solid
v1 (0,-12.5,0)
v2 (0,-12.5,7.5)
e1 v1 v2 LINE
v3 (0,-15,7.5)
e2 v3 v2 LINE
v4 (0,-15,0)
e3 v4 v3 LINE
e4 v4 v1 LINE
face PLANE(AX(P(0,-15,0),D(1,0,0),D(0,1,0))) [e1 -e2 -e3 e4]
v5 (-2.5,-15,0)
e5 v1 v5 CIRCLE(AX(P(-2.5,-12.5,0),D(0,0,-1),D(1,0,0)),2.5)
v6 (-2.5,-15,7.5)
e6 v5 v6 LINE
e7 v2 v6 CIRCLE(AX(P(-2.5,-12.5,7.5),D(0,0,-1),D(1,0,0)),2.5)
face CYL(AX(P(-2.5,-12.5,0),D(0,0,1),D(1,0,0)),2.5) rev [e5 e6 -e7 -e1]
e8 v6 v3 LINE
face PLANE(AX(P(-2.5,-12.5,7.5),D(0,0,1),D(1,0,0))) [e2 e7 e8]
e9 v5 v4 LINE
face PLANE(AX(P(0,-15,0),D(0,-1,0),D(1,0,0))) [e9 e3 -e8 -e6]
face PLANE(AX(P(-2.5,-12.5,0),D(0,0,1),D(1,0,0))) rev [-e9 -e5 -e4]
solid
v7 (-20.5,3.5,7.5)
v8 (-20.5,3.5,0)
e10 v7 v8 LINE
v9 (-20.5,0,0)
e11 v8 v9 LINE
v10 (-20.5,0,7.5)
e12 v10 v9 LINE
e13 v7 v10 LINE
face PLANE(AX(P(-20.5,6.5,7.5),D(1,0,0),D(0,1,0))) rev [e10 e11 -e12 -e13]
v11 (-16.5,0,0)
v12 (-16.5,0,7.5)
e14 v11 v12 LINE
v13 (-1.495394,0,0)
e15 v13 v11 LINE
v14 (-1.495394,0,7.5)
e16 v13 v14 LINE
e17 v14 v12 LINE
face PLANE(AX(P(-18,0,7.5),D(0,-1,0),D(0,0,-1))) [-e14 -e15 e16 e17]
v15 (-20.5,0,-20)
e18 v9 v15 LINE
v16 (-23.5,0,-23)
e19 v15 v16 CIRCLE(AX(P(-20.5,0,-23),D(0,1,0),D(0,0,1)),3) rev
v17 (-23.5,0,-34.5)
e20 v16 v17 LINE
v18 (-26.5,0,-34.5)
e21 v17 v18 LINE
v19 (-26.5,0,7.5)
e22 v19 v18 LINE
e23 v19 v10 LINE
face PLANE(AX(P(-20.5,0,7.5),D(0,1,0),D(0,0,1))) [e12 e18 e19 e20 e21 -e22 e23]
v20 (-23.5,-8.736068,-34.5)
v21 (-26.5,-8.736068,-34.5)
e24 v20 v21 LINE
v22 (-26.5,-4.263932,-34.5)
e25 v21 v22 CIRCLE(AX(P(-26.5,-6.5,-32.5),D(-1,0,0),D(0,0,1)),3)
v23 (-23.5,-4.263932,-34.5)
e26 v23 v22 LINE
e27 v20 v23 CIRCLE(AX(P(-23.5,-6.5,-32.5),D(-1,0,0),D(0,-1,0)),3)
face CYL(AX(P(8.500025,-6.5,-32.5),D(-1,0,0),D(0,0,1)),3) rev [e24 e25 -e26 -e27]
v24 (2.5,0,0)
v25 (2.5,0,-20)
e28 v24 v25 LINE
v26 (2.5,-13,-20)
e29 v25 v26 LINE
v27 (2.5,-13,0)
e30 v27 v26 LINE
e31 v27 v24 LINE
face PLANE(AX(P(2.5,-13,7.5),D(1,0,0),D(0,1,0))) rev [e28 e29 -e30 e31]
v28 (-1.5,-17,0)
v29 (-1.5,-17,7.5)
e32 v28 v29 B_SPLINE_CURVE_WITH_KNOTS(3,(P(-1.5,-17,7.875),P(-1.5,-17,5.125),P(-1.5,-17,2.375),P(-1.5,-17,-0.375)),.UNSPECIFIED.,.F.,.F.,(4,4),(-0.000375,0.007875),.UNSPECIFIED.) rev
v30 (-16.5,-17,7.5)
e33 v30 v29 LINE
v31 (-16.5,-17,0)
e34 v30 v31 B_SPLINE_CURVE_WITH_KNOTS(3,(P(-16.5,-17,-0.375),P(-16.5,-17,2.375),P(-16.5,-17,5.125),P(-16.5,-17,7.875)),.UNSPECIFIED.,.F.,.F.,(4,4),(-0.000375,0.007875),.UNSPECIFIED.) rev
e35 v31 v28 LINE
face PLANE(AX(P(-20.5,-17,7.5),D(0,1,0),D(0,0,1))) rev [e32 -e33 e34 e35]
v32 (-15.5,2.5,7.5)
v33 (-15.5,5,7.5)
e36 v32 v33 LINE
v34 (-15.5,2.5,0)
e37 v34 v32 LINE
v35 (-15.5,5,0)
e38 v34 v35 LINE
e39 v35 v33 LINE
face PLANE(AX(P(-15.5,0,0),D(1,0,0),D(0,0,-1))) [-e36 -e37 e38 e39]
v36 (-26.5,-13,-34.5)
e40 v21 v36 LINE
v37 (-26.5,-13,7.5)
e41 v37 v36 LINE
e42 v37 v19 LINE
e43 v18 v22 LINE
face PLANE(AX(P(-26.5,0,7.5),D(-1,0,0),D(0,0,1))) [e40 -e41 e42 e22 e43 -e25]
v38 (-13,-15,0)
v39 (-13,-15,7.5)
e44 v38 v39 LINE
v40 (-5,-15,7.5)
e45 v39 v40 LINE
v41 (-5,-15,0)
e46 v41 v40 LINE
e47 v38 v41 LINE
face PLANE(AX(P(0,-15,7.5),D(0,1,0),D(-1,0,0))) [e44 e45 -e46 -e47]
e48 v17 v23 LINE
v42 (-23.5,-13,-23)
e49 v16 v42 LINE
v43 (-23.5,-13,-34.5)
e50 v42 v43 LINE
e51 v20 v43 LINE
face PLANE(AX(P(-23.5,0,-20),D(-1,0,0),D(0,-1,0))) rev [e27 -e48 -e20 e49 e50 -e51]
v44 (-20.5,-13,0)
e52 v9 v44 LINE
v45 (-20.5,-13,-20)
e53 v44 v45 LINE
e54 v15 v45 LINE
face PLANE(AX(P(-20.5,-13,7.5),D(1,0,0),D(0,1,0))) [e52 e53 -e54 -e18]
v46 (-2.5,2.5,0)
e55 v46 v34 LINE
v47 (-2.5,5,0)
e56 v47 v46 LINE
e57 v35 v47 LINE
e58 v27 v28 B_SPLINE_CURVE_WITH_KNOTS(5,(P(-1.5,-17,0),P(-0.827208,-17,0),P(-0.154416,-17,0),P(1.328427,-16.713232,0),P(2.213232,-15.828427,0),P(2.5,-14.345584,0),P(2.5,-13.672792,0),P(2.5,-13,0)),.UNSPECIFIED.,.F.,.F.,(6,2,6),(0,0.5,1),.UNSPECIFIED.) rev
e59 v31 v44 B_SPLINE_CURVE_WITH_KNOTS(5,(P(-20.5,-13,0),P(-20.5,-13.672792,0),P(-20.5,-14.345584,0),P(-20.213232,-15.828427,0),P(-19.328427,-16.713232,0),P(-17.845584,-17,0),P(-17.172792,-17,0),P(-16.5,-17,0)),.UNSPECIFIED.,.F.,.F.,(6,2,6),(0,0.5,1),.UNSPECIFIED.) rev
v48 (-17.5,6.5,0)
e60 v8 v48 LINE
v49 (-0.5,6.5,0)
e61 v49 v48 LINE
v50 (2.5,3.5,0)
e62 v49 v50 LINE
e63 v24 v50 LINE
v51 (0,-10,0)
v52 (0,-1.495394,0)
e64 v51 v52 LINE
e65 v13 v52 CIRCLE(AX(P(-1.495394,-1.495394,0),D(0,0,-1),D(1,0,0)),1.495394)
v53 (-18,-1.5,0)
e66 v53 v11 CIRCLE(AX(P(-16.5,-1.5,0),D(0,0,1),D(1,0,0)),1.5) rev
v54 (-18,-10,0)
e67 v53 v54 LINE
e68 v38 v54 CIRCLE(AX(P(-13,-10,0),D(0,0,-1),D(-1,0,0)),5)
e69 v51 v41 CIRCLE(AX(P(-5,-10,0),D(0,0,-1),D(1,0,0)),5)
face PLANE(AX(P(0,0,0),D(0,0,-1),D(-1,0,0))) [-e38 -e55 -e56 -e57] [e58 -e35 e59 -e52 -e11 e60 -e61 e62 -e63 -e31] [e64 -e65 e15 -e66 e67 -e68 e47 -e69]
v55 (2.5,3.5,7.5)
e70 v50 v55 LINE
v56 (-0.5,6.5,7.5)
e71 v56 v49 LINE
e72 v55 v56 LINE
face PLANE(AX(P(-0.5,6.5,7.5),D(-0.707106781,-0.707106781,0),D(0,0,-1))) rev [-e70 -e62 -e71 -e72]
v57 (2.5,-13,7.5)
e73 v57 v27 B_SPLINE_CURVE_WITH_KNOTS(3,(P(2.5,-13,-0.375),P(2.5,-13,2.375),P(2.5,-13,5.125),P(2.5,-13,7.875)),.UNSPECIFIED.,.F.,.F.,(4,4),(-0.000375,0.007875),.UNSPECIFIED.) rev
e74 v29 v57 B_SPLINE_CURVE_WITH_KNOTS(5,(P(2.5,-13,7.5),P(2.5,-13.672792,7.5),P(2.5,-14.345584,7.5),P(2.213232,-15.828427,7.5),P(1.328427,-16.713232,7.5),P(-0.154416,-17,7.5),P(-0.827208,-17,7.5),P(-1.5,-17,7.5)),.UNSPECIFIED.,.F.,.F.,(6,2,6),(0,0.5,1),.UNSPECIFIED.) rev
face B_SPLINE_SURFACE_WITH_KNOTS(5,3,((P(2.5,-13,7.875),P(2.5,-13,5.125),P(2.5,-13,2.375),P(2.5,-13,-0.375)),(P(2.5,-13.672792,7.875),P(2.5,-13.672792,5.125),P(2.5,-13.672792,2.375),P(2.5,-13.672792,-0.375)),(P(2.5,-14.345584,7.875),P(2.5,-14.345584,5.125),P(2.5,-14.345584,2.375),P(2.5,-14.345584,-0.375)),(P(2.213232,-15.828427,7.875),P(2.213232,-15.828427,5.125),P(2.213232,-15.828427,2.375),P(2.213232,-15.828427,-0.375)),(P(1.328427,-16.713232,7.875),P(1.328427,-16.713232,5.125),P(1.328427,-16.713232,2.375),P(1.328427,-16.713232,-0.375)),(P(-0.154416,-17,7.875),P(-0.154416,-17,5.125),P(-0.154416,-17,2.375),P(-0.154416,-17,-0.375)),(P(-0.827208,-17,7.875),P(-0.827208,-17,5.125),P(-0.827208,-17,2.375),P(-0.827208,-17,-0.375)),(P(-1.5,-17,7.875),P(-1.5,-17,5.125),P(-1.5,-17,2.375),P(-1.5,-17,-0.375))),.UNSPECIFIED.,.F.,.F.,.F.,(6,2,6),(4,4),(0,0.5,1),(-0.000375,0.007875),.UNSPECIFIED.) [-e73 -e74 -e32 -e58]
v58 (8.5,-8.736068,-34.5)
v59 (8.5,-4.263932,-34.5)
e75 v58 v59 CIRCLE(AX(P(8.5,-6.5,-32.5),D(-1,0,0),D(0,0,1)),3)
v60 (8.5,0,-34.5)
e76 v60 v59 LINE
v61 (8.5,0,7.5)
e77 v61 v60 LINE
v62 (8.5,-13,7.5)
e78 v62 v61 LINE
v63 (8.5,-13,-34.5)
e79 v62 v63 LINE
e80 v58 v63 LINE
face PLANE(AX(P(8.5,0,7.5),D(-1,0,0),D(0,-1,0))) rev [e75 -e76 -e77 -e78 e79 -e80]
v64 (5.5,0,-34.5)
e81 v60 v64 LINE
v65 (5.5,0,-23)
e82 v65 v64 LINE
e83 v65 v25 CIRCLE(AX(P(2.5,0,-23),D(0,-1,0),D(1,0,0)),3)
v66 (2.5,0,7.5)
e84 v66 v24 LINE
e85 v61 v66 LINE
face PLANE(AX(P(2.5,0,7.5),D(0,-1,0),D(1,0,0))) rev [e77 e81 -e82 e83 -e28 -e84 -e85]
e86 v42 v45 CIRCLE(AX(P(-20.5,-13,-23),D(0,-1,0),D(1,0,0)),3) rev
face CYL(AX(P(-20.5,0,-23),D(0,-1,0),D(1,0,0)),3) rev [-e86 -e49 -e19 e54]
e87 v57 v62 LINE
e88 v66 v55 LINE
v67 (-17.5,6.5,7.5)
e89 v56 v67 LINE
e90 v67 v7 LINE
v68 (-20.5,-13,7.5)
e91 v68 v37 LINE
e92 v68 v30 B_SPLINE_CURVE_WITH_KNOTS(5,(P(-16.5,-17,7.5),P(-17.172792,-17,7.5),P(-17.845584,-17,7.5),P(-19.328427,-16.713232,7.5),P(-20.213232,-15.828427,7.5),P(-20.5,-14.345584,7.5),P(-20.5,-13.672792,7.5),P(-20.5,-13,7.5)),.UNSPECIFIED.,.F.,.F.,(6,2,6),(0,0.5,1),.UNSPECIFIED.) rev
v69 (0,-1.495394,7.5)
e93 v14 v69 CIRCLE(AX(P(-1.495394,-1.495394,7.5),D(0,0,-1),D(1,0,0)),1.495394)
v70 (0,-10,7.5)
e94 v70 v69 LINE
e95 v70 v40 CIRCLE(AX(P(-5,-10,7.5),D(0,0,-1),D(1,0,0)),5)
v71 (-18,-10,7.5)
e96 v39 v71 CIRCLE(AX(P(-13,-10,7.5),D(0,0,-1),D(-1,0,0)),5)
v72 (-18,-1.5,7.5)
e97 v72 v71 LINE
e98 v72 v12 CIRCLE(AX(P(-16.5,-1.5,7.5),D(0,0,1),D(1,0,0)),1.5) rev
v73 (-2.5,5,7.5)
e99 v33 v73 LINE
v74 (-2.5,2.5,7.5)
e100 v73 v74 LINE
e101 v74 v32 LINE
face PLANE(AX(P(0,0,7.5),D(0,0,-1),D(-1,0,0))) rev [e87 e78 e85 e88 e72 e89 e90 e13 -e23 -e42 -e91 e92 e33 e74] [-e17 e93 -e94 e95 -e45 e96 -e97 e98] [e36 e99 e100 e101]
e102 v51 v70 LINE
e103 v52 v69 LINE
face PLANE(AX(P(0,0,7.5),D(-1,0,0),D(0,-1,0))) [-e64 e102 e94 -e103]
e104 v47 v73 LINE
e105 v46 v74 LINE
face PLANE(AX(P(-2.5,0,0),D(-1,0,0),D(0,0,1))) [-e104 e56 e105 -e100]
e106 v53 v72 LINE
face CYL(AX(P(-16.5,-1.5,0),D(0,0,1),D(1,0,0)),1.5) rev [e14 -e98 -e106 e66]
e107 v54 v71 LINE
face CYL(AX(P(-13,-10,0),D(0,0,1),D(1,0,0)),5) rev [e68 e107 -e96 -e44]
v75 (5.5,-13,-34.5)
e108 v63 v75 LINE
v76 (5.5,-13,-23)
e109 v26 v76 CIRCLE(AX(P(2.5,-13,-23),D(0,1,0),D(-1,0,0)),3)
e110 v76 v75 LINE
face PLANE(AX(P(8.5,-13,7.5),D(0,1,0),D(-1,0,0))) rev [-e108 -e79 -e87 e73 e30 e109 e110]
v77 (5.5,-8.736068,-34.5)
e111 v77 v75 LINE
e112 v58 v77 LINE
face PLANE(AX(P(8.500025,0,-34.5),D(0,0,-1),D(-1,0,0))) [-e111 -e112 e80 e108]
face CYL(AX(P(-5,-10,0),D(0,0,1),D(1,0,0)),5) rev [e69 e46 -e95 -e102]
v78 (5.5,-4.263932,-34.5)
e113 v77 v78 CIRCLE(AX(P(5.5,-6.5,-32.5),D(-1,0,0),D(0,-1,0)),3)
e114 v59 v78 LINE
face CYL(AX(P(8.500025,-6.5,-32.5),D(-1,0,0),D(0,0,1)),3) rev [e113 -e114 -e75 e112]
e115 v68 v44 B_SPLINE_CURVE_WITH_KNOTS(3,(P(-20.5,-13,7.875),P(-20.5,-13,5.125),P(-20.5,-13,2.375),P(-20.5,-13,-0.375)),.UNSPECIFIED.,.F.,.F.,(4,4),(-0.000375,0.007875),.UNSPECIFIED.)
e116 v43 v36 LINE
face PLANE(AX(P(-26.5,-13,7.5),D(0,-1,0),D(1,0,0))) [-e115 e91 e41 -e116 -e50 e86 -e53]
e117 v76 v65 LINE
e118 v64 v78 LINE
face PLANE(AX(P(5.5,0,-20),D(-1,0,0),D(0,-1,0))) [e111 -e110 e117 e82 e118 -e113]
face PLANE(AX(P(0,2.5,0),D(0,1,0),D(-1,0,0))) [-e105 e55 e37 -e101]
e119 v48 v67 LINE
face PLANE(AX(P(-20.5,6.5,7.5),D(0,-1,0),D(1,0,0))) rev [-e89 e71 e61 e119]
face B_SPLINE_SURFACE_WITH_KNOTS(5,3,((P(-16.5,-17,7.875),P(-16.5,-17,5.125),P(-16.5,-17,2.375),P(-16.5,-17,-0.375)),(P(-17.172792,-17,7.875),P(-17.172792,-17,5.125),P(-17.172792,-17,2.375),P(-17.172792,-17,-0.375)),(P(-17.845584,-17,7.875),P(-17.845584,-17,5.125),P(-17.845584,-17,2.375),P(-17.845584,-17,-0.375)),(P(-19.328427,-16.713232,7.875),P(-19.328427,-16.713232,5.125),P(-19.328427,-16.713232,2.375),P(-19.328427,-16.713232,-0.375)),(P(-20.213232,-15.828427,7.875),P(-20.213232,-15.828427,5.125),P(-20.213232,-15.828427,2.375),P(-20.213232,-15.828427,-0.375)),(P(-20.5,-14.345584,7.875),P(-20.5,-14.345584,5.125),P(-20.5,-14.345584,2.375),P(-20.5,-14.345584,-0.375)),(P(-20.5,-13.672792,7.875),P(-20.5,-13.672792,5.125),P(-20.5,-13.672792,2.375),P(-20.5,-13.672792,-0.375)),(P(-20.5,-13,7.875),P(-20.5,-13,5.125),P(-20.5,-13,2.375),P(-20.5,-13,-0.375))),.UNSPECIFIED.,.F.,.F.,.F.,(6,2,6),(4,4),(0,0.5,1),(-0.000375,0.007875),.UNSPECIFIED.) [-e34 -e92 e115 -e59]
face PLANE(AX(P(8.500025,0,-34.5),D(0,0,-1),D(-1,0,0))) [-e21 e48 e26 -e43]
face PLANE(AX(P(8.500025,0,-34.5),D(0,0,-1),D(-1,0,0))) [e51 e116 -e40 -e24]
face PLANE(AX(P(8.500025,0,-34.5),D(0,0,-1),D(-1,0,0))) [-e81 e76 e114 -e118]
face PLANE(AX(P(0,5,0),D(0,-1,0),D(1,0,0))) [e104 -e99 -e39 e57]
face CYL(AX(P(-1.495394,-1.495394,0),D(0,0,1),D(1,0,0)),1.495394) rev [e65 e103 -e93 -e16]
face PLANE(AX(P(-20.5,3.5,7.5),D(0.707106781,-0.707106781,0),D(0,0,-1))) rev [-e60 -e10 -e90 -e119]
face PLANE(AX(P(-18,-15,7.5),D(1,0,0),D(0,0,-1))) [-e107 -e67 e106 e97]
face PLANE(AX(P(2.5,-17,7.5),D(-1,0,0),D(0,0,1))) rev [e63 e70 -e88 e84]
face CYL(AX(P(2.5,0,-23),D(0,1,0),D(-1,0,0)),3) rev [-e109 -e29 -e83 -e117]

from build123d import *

# Parameters (mm, degrees)
SKETCH1_W            = 23
SKETCH1_H            = 23.5
SKETCH1_W_2          = 18
SKETCH1_H_2          = 15
BOSS_EXTRUDE1_DEPTH  = 7.5
FILLET1_SIZE         = 4
BOSS_EXTRUDE2_DEPTH  = 7.5
BOSS_EXTRUDE3_DEPTH  = 7.5
BOSS_EXTRUDE4_DEPTH  = 7.5
BOSS_EXTRUDE11_DEPTH = 7.5
CHAMFER1_SIZE        = 3
SKETCH8_W            = 13
SKETCH8_H            = 2.5
CUT_EXTRUDE1_DEPTH   = 7.5
BOSS_EXTRUDE12_START = -7.5
SKETCH9_W            = 6
SKETCH9_H            = 13
BOSS_EXTRUDE12_DEPTH = 52.5
SKETCH11_W           = 3
SKETCH11_H           = 13
CUT_EXTRUDE3_DEPTH   = 25
FILLET3_R            = 3
FILLET3_OF_MIRROR7_R = 3
SKETCH12_R           = 3
SKETCH12_W           = 10.5
SKETCH12_H           = 13
CUT_EXTRUDE4_DEPTH   = 60.489494958


# Some blends are built 0.0001 mm under size
with BuildPart() as part:
    # Sketch1 → Boss-Extrude1 (new body)
    with BuildSketch(Plane.XY):
        with Locations((-9, -5.25)):
            Rectangle(SKETCH1_W, SKETCH1_H)
        with Locations((-9, -7.5)):
            Rectangle(SKETCH1_W_2, SKETCH1_H_2, mode=Mode.SUBTRACT)
    extrude(amount=BOSS_EXTRUDE1_DEPTH)

    # Fillet1
    # a fillet whose section is not a circle: 4 mm, written as the material it takes off along each edge
    with BuildSketch(Plane(origin=(-20.5, -17, -10), x_dir=(0, 1, 0), z_dir=(0, 0, 1)), Plane(origin=(2.5, -17, -10), x_dir=(-1, 0, 0), z_dir=(0, 0, 1))) as fillet1_piece_1:
        with BuildLine():
            add(Edge.make_bspline([(FILLET1_SIZE, 0), (FILLET1_SIZE * 0.831801948466, 0), (FILLET1_SIZE * 0.663603896932, 0), (FILLET1_SIZE * 0.292893218813, -FILLET1_SIZE * 0.0716919198361), (FILLET1_SIZE * 0.0716919198361, -FILLET1_SIZE * 0.292893218813), (0, -FILLET1_SIZE * 0.663603896932), (0, -FILLET1_SIZE * 0.831801948466), (0, -FILLET1_SIZE)], knots=[0, 0, 0, 0, 0, 0, 0.5, 0.5, 1, 1, 1, 1, 1, 1], degree=5))
            Line((0, -FILLET1_SIZE), (0, 0))
            Line((0, 0), (FILLET1_SIZE, 0))
        make_face()
    extrude(amount=27.5, mode=Mode.SUBTRACT)

    # Sketch3 → Boss-Extrude2 (add)
    with BuildSketch(Plane.XY.offset(7.5)):
        with BuildLine():
            Line((-16.5, 0), (-18, 0))
            Line((-18, 0), (-18, -1.5))
            ThreePointArc((-18, -1.5), (-17.560660172, -0.439339828), (-16.5, 0))
        make_face()
    extrude(amount=-BOSS_EXTRUDE2_DEPTH)

    # Sketch4 → Boss-Extrude3 (add)
    with BuildSketch(Plane.XY.offset(7.5)):
        with BuildLine():
            Line((0, 0), (0, -1.495394009))
            ThreePointArc((0, -1.495394009), (-0.437990765, -0.437990765), (-1.495394009, 0))
            Line((-1.495394009, 0), (0, 0))
        make_face()
    extrude(amount=-BOSS_EXTRUDE3_DEPTH)

    # Sketch7 → Boss-Extrude11 (add)
    with BuildSketch(Plane.XY.offset(7.5)):
        with BuildLine():
            Line((-18, -15), (-13, -15))
            ThreePointArc((-13, -15), (-16.535533906, -13.535533906), (-18, -10))
            Line((-18, -10), (-18, -15))
        make_face()
        with BuildLine():
            Line((0, -15), (-5, -15))
            ThreePointArc((-5, -15), (-1.464466094, -13.535533906), (0, -10))
            Line((0, -10), (0, -15))
        make_face()
    extrude(amount=-BOSS_EXTRUDE11_DEPTH)

    # Chamfer1
    chamfer1_edges = [part.edges().sort_by_distance(p)[0] for p in [
        (2.5, 6.5, 3.75),
        (-20.5, 6.5, 3.75),
    ]]
    chamfer(chamfer1_edges, length=CHAMFER1_SIZE)

    # Sketch8 → Cut-Extrude1 (cut)
    with BuildSketch(Plane.XY.offset(7.5)):
        with Locations((-9, 3.75)):
            Rectangle(SKETCH8_W, SKETCH8_H)
    extrude(amount=-CUT_EXTRUDE1_DEPTH, mode=Mode.SUBTRACT)

    # Sketch9 → Boss-Extrude12 (add)
    with BuildSketch(Plane(origin=(0, 0, 0), x_dir=(-1, 0, 0), z_dir=(0, 0, -1)).offset(BOSS_EXTRUDE12_START)):
        with Locations((23.5, -6.5)):
            Rectangle(SKETCH9_W, SKETCH9_H)
    boss_extrude12 = extrude(amount=BOSS_EXTRUDE12_DEPTH)

    # Sketch11 → Cut-Extrude3 (cut)
    with BuildSketch(Plane(origin=(0, 0, -45), x_dir=(-1, 0, 0), z_dir=(0, 0, -1))):
        with Locations((22, -6.5)):
            Rectangle(SKETCH11_W, SKETCH11_H)
    cut_extrude3 = extrude(amount=-CUT_EXTRUDE3_DEPTH, mode=Mode.SUBTRACT)

    # Fillet3
    fillet3_edges = [part.edges().sort_by_distance(p)[0] for p in [
        (-23.5, -6.5, -20),
    ]]
    fillet(fillet3_edges, radius=FILLET3_R - 0.0001)  # a hair under: the kernel refuses the full size

    # Mirror7: Boss-Extrude12, Cut-Extrude3 across plane
    add(boss_extrude12.mirror(Plane.ZY.offset(9)))
    add(cut_extrude3.mirror(Plane.ZY.offset(9)), mode=Mode.SUBTRACT)

    # Fillet3 of Mirror7
    fillet3_of_mirror7_edges = [part.edges().sort_by_distance(p)[0] for p in [
        (5.5, -6.5, -20),
    ]]
    fillet(fillet3_of_mirror7_edges, radius=FILLET3_OF_MIRROR7_R - 0.0001)  # a hair under: the kernel refuses the full size

    # Sketch12 → Cut-Extrude4 (cut, through all)
    with BuildSketch(Plane.ZY.offset(26.5)):
        with Locations((-32.5, -6.5)):
            Circle(SKETCH12_R)
        with Locations((-39.75, -6.5)):
            Rectangle(SKETCH12_W, SKETCH12_H)
    extrude(amount=-CUT_EXTRUDE4_DEPTH, mode=Mode.SUBTRACT)


with BuildPart() as body_2:
    # Sketch6 → Boss-Extrude4 (new body)
    with BuildSketch(Plane.XY.offset(7.5)):
        with BuildLine():
            Line((0, -15), (0, -12.5))
            ThreePointArc((0, -12.5), (-0.732233047, -14.267766953), (-2.5, -15))
            Line((-2.5, -15), (0, -15))
        make_face()
    extrude(amount=-BOSS_EXTRUDE4_DEPTH)


solid = Compound([part.part, body_2.part])
